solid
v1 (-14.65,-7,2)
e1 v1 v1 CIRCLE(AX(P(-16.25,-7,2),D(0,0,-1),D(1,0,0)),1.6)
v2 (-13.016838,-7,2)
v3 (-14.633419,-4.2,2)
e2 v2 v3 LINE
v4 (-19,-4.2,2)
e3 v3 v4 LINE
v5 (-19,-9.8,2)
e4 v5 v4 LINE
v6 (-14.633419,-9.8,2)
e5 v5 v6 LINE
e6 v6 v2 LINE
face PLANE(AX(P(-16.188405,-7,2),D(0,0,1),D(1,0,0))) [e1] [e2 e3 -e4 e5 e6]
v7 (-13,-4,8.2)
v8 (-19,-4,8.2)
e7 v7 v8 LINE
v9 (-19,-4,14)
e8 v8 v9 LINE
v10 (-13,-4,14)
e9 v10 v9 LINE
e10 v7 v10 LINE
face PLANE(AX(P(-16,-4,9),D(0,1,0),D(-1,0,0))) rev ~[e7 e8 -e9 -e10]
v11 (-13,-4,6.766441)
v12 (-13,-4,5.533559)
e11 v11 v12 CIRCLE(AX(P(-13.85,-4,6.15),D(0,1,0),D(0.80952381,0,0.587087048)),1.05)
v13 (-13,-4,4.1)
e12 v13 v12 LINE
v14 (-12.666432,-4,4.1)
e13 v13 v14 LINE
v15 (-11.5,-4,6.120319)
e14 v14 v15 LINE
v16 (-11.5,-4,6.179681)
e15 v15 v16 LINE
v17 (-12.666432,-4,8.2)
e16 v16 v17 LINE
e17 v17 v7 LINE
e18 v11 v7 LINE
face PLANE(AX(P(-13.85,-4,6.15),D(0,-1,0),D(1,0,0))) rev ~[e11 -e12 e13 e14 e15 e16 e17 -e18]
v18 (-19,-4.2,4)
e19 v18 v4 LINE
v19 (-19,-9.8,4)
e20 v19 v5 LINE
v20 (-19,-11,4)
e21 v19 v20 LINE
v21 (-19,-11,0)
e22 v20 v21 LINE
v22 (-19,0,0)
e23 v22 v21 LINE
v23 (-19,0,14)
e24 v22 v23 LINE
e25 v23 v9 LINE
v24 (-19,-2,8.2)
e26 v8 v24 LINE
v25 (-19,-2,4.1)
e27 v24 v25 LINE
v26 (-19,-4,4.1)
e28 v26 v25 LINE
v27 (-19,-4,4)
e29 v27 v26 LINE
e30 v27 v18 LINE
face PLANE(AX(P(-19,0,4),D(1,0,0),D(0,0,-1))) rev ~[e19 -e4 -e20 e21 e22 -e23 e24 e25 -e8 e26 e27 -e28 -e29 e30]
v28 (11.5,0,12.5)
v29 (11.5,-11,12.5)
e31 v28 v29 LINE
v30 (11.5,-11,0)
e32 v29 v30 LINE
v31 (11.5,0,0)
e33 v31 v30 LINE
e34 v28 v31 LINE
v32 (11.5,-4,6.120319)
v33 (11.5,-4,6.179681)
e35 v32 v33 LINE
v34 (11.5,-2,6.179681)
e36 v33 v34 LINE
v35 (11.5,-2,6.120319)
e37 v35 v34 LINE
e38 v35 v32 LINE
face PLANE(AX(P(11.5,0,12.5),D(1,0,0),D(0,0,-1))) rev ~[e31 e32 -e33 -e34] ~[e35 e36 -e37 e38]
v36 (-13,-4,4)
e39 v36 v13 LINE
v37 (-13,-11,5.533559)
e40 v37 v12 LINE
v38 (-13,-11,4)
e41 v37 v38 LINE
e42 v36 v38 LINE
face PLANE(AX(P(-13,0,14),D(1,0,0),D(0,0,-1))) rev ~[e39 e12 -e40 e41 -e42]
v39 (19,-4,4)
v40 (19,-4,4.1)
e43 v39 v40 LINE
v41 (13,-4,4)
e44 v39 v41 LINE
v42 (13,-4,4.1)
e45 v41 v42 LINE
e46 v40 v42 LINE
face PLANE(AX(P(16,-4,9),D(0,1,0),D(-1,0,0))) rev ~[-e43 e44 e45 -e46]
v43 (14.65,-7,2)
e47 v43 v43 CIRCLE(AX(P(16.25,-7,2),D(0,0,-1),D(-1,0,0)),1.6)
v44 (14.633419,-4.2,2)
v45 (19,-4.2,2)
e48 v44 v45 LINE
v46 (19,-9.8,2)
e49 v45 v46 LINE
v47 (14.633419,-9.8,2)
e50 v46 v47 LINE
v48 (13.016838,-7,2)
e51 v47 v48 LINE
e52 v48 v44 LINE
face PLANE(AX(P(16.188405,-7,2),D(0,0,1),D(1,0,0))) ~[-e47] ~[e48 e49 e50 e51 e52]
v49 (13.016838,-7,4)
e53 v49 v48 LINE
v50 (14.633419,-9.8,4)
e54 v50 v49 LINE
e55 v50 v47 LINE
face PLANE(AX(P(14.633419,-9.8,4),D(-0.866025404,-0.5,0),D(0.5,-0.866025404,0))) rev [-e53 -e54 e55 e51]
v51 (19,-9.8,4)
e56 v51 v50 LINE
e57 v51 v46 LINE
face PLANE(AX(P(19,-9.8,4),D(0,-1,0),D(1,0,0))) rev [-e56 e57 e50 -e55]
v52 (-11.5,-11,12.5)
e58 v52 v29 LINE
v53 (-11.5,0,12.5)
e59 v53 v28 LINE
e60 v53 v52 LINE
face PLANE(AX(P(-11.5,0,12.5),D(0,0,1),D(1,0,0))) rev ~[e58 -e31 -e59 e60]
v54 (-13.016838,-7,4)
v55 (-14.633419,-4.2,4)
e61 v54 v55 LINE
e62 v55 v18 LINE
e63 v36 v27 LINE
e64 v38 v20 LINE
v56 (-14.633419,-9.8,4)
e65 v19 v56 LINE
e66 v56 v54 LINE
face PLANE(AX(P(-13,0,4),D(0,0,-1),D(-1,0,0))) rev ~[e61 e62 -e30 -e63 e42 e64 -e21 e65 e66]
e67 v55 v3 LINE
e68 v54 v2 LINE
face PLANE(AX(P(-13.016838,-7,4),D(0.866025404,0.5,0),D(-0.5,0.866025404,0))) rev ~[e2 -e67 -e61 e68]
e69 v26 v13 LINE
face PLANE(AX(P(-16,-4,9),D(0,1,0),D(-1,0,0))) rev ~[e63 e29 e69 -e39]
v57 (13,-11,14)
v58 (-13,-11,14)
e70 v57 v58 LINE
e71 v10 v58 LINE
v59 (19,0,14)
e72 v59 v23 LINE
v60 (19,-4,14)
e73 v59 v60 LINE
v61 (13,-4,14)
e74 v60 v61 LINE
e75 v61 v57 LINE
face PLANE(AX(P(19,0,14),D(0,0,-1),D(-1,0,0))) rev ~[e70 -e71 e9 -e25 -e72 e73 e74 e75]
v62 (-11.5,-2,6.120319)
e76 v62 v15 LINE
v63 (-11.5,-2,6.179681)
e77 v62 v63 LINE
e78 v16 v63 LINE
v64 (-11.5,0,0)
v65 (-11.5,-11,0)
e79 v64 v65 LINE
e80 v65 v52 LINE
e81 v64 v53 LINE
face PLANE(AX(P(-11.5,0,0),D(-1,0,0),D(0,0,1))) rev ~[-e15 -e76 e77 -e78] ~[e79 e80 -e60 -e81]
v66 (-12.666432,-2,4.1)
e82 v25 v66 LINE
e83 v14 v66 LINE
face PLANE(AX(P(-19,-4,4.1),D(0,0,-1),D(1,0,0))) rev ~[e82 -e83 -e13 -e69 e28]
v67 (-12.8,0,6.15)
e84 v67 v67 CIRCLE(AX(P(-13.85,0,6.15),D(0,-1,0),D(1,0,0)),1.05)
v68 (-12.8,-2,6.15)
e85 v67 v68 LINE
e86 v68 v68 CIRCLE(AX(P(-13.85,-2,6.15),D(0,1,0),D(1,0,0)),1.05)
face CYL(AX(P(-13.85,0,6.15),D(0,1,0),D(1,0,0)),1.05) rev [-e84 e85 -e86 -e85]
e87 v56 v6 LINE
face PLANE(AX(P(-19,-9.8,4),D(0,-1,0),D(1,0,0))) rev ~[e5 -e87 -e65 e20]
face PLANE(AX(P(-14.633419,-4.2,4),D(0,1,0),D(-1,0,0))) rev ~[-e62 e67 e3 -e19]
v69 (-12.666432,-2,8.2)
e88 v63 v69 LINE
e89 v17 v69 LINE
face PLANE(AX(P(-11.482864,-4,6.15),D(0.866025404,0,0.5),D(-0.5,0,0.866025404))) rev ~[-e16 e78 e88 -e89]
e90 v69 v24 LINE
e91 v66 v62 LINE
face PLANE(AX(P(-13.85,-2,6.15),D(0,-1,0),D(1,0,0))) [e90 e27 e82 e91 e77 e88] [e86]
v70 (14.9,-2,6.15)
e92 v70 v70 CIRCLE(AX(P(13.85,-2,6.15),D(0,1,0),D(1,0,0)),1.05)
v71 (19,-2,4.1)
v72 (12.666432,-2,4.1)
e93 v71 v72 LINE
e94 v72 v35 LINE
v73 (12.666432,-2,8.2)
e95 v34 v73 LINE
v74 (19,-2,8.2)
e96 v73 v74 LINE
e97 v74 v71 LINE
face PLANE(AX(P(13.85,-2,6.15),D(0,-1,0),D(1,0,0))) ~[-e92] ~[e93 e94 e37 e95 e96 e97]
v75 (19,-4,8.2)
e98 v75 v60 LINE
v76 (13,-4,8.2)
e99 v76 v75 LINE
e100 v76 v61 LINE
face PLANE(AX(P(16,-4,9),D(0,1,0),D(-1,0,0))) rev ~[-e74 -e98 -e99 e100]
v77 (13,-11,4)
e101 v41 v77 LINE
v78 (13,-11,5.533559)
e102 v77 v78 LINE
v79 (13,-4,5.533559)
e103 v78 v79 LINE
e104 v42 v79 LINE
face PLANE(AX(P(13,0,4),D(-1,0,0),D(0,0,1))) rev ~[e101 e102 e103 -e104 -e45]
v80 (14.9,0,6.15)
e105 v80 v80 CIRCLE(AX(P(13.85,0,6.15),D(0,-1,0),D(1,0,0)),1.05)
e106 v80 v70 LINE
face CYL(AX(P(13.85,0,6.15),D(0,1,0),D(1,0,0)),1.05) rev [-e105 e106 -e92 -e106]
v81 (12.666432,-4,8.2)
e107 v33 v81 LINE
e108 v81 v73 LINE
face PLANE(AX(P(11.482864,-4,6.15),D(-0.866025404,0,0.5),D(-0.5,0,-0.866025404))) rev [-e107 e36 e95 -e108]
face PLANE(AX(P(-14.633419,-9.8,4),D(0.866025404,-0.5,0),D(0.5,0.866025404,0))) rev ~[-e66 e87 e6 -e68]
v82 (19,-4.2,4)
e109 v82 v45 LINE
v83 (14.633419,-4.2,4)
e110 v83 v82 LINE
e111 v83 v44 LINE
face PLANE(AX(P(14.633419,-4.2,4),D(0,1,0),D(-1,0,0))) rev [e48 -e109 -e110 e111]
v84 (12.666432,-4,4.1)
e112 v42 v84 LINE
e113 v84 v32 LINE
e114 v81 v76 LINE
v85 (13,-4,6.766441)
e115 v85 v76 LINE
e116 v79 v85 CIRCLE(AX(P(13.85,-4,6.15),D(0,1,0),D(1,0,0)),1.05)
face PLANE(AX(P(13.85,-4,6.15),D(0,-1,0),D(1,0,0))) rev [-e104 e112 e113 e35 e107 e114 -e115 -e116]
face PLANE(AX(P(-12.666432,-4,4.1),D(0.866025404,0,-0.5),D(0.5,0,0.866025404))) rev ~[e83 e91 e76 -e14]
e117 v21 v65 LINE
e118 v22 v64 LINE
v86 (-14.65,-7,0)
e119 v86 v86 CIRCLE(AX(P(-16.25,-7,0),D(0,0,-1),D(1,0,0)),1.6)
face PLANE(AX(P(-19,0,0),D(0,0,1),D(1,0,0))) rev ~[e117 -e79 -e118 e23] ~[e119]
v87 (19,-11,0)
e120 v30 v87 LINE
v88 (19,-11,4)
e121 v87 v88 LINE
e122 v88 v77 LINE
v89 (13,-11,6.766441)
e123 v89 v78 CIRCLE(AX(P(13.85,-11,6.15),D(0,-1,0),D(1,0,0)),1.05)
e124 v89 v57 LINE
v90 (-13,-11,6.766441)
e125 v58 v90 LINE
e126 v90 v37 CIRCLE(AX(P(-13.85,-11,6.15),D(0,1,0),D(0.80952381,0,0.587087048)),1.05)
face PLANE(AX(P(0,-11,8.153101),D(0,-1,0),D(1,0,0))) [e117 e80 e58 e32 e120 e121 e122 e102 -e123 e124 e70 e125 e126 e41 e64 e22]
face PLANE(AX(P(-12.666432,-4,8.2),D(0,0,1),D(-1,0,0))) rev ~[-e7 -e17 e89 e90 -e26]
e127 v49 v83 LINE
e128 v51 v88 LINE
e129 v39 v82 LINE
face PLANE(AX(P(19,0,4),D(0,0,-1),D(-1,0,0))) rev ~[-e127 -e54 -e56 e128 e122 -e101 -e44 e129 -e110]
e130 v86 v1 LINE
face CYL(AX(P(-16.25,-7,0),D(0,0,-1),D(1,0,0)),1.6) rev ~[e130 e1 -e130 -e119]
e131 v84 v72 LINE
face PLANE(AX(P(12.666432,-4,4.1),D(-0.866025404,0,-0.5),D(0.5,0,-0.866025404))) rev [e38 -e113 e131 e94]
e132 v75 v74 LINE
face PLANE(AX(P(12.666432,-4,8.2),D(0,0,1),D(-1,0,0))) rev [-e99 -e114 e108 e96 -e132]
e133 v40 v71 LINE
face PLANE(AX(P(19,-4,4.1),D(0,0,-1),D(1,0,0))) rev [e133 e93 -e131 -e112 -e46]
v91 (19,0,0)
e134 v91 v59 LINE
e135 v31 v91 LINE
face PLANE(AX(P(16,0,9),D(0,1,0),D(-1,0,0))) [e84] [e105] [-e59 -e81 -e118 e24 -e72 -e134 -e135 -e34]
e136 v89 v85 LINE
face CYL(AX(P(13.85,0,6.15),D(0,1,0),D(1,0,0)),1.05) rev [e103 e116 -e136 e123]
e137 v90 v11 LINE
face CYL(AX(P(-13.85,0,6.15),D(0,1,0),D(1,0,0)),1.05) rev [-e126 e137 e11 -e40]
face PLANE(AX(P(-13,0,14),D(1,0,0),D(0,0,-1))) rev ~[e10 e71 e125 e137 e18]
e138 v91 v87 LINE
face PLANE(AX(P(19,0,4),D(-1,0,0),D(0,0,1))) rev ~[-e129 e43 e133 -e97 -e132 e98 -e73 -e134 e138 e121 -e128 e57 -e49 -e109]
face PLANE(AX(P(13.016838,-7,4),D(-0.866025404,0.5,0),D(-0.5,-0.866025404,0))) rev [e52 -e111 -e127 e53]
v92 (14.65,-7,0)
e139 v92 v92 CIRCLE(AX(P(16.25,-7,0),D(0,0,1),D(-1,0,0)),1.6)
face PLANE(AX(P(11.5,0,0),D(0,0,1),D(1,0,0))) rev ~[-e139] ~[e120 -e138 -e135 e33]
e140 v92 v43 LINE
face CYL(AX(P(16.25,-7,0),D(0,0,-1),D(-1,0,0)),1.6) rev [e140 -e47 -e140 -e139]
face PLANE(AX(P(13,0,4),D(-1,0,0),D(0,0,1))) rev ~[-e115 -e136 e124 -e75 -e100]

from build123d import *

# Parameters (mm, degrees)
F1_DEPTH        = 11
F2_W            = 6
F2_H            = 10
F3_DEPTH        = 4
F4_R            = 1.05
F5_DEPTH        = 11
F5_COPIES_COUNT = 2
F5_COPIES_PITCH = 27.7
F7_DEPTH        = 2
F8_R            = 1.6
F9_DEPTH        = 4
F11_DEPTH       = 2


# Not quite as in the source:
# - a pattern or mirror of a feature is missing from the dataset's text; its kind, count and spacing are read off the source's solid


with BuildPart() as f1:
    # F0 (on Front) → F1 (new body)
    with BuildSketch(Plane.XZ):
        Polygon((-19, 4), (-19, 0), (-11.5, 0), (-11.5, 12.5), (11.5, 12.5), (11.5, 0), (19, 0), (19, 4), (13, 4), (13, 14), (-13, 14), (-13, 4), align=None)
    extrude(amount=F1_DEPTH)

    # F2 (on face) → F3 (join)
    with BuildSketch(Plane(origin=(0, 0, 0), x_dir=(-1, 0, 0), z_dir=(0, 1, 0))):
        with Locations((-16, 9)):
            Rectangle(F2_W, F2_H)
        with Locations((16, 9)):
            Rectangle(F2_W, F2_H)
    extrude(amount=-F3_DEPTH)

    # F4 (on Front) → F5 (cut, through all)
    with BuildSketch(Plane.XZ):
        with Locations((-13.85, 6.15)):
            Circle(F4_R)
    f5 = extrude(amount=F5_DEPTH, mode=Mode.SUBTRACT)

    # F5_copies: F5 ×2
    with Locations(*[(i * F5_COPIES_PITCH, 0, 0) for i in range(1, F5_COPIES_COUNT)]):
        add(f5, mode=Mode.SUBTRACT)

    # F6 (on face) → F7 (cut)
    with BuildSketch(Plane.XZ.offset(4)):
        Polygon((-12.6664319482, 8.2), (-15.0335680518, 8.2), (-16.2171361037, 6.15), (-15.0335680518, 4.1), (-12.6664319482, 4.1), (-11.4828638963, 6.15), align=None)
        Polygon((-16.2171361037, 6.15), (-15.0335680518, 8.2), (-19, 8.2), (-19, 4.1), (-15.0335680518, 4.1), align=None)
    f7 = extrude(amount=-F7_DEPTH, mode=Mode.SUBTRACT)

    # F7_copies: F7 across plane
    add(f7.mirror(Plane(origin=(0, 0, 0), x_dir=(0, 0, 1), z_dir=(1, 0, 0))), mode=Mode.SUBTRACT)

    # F8 (on face) → F9 (cut, through all)
    with BuildSketch(Plane(origin=(0, 0, 0), x_dir=(1, 0, 0), z_dir=(0, 0, -1))):
        with Locations((-16.25, 7)):
            Circle(F8_R)
    f9 = extrude(amount=-F9_DEPTH, mode=Mode.SUBTRACT)

    # F9_copies: F9 across plane
    add(f9.mirror(Plane(origin=(0, 0, 0), x_dir=(0, 0, 1), z_dir=(1, 0, 0))), mode=Mode.SUBTRACT)

    # F10 (on face) → F11 (cut)
    with BuildSketch(Plane.XY.offset(4)):
        Polygon((-14.6334192463, -4.2), (-17.8665807537, -4.2), (-19, -6.1631397208), (-19, -7.8368602792), (-17.8665807537, -9.8), (-14.6334192463, -9.8), (-13.0168384925, -7), align=None)
        Polygon((-19, -6.1631397208), (-17.8665807537, -4.2), (-19, -4.2), align=None)
        Polygon((-19, -7.8368602792), (-19, -6.1631397208), (-19.4831615075, -7), align=None)
        Polygon((-17.8665807537, -9.8), (-19, -7.8368602792), (-19, -9.8), align=None)
    f11 = extrude(amount=-F11_DEPTH, mode=Mode.SUBTRACT)

    # F11_copies: F11 across plane
    add(f11.mirror(Plane(origin=(0, 0, 0), x_dir=(0, 0, 1), z_dir=(1, 0, 0))), mode=Mode.SUBTRACT)


solid = f1.part
